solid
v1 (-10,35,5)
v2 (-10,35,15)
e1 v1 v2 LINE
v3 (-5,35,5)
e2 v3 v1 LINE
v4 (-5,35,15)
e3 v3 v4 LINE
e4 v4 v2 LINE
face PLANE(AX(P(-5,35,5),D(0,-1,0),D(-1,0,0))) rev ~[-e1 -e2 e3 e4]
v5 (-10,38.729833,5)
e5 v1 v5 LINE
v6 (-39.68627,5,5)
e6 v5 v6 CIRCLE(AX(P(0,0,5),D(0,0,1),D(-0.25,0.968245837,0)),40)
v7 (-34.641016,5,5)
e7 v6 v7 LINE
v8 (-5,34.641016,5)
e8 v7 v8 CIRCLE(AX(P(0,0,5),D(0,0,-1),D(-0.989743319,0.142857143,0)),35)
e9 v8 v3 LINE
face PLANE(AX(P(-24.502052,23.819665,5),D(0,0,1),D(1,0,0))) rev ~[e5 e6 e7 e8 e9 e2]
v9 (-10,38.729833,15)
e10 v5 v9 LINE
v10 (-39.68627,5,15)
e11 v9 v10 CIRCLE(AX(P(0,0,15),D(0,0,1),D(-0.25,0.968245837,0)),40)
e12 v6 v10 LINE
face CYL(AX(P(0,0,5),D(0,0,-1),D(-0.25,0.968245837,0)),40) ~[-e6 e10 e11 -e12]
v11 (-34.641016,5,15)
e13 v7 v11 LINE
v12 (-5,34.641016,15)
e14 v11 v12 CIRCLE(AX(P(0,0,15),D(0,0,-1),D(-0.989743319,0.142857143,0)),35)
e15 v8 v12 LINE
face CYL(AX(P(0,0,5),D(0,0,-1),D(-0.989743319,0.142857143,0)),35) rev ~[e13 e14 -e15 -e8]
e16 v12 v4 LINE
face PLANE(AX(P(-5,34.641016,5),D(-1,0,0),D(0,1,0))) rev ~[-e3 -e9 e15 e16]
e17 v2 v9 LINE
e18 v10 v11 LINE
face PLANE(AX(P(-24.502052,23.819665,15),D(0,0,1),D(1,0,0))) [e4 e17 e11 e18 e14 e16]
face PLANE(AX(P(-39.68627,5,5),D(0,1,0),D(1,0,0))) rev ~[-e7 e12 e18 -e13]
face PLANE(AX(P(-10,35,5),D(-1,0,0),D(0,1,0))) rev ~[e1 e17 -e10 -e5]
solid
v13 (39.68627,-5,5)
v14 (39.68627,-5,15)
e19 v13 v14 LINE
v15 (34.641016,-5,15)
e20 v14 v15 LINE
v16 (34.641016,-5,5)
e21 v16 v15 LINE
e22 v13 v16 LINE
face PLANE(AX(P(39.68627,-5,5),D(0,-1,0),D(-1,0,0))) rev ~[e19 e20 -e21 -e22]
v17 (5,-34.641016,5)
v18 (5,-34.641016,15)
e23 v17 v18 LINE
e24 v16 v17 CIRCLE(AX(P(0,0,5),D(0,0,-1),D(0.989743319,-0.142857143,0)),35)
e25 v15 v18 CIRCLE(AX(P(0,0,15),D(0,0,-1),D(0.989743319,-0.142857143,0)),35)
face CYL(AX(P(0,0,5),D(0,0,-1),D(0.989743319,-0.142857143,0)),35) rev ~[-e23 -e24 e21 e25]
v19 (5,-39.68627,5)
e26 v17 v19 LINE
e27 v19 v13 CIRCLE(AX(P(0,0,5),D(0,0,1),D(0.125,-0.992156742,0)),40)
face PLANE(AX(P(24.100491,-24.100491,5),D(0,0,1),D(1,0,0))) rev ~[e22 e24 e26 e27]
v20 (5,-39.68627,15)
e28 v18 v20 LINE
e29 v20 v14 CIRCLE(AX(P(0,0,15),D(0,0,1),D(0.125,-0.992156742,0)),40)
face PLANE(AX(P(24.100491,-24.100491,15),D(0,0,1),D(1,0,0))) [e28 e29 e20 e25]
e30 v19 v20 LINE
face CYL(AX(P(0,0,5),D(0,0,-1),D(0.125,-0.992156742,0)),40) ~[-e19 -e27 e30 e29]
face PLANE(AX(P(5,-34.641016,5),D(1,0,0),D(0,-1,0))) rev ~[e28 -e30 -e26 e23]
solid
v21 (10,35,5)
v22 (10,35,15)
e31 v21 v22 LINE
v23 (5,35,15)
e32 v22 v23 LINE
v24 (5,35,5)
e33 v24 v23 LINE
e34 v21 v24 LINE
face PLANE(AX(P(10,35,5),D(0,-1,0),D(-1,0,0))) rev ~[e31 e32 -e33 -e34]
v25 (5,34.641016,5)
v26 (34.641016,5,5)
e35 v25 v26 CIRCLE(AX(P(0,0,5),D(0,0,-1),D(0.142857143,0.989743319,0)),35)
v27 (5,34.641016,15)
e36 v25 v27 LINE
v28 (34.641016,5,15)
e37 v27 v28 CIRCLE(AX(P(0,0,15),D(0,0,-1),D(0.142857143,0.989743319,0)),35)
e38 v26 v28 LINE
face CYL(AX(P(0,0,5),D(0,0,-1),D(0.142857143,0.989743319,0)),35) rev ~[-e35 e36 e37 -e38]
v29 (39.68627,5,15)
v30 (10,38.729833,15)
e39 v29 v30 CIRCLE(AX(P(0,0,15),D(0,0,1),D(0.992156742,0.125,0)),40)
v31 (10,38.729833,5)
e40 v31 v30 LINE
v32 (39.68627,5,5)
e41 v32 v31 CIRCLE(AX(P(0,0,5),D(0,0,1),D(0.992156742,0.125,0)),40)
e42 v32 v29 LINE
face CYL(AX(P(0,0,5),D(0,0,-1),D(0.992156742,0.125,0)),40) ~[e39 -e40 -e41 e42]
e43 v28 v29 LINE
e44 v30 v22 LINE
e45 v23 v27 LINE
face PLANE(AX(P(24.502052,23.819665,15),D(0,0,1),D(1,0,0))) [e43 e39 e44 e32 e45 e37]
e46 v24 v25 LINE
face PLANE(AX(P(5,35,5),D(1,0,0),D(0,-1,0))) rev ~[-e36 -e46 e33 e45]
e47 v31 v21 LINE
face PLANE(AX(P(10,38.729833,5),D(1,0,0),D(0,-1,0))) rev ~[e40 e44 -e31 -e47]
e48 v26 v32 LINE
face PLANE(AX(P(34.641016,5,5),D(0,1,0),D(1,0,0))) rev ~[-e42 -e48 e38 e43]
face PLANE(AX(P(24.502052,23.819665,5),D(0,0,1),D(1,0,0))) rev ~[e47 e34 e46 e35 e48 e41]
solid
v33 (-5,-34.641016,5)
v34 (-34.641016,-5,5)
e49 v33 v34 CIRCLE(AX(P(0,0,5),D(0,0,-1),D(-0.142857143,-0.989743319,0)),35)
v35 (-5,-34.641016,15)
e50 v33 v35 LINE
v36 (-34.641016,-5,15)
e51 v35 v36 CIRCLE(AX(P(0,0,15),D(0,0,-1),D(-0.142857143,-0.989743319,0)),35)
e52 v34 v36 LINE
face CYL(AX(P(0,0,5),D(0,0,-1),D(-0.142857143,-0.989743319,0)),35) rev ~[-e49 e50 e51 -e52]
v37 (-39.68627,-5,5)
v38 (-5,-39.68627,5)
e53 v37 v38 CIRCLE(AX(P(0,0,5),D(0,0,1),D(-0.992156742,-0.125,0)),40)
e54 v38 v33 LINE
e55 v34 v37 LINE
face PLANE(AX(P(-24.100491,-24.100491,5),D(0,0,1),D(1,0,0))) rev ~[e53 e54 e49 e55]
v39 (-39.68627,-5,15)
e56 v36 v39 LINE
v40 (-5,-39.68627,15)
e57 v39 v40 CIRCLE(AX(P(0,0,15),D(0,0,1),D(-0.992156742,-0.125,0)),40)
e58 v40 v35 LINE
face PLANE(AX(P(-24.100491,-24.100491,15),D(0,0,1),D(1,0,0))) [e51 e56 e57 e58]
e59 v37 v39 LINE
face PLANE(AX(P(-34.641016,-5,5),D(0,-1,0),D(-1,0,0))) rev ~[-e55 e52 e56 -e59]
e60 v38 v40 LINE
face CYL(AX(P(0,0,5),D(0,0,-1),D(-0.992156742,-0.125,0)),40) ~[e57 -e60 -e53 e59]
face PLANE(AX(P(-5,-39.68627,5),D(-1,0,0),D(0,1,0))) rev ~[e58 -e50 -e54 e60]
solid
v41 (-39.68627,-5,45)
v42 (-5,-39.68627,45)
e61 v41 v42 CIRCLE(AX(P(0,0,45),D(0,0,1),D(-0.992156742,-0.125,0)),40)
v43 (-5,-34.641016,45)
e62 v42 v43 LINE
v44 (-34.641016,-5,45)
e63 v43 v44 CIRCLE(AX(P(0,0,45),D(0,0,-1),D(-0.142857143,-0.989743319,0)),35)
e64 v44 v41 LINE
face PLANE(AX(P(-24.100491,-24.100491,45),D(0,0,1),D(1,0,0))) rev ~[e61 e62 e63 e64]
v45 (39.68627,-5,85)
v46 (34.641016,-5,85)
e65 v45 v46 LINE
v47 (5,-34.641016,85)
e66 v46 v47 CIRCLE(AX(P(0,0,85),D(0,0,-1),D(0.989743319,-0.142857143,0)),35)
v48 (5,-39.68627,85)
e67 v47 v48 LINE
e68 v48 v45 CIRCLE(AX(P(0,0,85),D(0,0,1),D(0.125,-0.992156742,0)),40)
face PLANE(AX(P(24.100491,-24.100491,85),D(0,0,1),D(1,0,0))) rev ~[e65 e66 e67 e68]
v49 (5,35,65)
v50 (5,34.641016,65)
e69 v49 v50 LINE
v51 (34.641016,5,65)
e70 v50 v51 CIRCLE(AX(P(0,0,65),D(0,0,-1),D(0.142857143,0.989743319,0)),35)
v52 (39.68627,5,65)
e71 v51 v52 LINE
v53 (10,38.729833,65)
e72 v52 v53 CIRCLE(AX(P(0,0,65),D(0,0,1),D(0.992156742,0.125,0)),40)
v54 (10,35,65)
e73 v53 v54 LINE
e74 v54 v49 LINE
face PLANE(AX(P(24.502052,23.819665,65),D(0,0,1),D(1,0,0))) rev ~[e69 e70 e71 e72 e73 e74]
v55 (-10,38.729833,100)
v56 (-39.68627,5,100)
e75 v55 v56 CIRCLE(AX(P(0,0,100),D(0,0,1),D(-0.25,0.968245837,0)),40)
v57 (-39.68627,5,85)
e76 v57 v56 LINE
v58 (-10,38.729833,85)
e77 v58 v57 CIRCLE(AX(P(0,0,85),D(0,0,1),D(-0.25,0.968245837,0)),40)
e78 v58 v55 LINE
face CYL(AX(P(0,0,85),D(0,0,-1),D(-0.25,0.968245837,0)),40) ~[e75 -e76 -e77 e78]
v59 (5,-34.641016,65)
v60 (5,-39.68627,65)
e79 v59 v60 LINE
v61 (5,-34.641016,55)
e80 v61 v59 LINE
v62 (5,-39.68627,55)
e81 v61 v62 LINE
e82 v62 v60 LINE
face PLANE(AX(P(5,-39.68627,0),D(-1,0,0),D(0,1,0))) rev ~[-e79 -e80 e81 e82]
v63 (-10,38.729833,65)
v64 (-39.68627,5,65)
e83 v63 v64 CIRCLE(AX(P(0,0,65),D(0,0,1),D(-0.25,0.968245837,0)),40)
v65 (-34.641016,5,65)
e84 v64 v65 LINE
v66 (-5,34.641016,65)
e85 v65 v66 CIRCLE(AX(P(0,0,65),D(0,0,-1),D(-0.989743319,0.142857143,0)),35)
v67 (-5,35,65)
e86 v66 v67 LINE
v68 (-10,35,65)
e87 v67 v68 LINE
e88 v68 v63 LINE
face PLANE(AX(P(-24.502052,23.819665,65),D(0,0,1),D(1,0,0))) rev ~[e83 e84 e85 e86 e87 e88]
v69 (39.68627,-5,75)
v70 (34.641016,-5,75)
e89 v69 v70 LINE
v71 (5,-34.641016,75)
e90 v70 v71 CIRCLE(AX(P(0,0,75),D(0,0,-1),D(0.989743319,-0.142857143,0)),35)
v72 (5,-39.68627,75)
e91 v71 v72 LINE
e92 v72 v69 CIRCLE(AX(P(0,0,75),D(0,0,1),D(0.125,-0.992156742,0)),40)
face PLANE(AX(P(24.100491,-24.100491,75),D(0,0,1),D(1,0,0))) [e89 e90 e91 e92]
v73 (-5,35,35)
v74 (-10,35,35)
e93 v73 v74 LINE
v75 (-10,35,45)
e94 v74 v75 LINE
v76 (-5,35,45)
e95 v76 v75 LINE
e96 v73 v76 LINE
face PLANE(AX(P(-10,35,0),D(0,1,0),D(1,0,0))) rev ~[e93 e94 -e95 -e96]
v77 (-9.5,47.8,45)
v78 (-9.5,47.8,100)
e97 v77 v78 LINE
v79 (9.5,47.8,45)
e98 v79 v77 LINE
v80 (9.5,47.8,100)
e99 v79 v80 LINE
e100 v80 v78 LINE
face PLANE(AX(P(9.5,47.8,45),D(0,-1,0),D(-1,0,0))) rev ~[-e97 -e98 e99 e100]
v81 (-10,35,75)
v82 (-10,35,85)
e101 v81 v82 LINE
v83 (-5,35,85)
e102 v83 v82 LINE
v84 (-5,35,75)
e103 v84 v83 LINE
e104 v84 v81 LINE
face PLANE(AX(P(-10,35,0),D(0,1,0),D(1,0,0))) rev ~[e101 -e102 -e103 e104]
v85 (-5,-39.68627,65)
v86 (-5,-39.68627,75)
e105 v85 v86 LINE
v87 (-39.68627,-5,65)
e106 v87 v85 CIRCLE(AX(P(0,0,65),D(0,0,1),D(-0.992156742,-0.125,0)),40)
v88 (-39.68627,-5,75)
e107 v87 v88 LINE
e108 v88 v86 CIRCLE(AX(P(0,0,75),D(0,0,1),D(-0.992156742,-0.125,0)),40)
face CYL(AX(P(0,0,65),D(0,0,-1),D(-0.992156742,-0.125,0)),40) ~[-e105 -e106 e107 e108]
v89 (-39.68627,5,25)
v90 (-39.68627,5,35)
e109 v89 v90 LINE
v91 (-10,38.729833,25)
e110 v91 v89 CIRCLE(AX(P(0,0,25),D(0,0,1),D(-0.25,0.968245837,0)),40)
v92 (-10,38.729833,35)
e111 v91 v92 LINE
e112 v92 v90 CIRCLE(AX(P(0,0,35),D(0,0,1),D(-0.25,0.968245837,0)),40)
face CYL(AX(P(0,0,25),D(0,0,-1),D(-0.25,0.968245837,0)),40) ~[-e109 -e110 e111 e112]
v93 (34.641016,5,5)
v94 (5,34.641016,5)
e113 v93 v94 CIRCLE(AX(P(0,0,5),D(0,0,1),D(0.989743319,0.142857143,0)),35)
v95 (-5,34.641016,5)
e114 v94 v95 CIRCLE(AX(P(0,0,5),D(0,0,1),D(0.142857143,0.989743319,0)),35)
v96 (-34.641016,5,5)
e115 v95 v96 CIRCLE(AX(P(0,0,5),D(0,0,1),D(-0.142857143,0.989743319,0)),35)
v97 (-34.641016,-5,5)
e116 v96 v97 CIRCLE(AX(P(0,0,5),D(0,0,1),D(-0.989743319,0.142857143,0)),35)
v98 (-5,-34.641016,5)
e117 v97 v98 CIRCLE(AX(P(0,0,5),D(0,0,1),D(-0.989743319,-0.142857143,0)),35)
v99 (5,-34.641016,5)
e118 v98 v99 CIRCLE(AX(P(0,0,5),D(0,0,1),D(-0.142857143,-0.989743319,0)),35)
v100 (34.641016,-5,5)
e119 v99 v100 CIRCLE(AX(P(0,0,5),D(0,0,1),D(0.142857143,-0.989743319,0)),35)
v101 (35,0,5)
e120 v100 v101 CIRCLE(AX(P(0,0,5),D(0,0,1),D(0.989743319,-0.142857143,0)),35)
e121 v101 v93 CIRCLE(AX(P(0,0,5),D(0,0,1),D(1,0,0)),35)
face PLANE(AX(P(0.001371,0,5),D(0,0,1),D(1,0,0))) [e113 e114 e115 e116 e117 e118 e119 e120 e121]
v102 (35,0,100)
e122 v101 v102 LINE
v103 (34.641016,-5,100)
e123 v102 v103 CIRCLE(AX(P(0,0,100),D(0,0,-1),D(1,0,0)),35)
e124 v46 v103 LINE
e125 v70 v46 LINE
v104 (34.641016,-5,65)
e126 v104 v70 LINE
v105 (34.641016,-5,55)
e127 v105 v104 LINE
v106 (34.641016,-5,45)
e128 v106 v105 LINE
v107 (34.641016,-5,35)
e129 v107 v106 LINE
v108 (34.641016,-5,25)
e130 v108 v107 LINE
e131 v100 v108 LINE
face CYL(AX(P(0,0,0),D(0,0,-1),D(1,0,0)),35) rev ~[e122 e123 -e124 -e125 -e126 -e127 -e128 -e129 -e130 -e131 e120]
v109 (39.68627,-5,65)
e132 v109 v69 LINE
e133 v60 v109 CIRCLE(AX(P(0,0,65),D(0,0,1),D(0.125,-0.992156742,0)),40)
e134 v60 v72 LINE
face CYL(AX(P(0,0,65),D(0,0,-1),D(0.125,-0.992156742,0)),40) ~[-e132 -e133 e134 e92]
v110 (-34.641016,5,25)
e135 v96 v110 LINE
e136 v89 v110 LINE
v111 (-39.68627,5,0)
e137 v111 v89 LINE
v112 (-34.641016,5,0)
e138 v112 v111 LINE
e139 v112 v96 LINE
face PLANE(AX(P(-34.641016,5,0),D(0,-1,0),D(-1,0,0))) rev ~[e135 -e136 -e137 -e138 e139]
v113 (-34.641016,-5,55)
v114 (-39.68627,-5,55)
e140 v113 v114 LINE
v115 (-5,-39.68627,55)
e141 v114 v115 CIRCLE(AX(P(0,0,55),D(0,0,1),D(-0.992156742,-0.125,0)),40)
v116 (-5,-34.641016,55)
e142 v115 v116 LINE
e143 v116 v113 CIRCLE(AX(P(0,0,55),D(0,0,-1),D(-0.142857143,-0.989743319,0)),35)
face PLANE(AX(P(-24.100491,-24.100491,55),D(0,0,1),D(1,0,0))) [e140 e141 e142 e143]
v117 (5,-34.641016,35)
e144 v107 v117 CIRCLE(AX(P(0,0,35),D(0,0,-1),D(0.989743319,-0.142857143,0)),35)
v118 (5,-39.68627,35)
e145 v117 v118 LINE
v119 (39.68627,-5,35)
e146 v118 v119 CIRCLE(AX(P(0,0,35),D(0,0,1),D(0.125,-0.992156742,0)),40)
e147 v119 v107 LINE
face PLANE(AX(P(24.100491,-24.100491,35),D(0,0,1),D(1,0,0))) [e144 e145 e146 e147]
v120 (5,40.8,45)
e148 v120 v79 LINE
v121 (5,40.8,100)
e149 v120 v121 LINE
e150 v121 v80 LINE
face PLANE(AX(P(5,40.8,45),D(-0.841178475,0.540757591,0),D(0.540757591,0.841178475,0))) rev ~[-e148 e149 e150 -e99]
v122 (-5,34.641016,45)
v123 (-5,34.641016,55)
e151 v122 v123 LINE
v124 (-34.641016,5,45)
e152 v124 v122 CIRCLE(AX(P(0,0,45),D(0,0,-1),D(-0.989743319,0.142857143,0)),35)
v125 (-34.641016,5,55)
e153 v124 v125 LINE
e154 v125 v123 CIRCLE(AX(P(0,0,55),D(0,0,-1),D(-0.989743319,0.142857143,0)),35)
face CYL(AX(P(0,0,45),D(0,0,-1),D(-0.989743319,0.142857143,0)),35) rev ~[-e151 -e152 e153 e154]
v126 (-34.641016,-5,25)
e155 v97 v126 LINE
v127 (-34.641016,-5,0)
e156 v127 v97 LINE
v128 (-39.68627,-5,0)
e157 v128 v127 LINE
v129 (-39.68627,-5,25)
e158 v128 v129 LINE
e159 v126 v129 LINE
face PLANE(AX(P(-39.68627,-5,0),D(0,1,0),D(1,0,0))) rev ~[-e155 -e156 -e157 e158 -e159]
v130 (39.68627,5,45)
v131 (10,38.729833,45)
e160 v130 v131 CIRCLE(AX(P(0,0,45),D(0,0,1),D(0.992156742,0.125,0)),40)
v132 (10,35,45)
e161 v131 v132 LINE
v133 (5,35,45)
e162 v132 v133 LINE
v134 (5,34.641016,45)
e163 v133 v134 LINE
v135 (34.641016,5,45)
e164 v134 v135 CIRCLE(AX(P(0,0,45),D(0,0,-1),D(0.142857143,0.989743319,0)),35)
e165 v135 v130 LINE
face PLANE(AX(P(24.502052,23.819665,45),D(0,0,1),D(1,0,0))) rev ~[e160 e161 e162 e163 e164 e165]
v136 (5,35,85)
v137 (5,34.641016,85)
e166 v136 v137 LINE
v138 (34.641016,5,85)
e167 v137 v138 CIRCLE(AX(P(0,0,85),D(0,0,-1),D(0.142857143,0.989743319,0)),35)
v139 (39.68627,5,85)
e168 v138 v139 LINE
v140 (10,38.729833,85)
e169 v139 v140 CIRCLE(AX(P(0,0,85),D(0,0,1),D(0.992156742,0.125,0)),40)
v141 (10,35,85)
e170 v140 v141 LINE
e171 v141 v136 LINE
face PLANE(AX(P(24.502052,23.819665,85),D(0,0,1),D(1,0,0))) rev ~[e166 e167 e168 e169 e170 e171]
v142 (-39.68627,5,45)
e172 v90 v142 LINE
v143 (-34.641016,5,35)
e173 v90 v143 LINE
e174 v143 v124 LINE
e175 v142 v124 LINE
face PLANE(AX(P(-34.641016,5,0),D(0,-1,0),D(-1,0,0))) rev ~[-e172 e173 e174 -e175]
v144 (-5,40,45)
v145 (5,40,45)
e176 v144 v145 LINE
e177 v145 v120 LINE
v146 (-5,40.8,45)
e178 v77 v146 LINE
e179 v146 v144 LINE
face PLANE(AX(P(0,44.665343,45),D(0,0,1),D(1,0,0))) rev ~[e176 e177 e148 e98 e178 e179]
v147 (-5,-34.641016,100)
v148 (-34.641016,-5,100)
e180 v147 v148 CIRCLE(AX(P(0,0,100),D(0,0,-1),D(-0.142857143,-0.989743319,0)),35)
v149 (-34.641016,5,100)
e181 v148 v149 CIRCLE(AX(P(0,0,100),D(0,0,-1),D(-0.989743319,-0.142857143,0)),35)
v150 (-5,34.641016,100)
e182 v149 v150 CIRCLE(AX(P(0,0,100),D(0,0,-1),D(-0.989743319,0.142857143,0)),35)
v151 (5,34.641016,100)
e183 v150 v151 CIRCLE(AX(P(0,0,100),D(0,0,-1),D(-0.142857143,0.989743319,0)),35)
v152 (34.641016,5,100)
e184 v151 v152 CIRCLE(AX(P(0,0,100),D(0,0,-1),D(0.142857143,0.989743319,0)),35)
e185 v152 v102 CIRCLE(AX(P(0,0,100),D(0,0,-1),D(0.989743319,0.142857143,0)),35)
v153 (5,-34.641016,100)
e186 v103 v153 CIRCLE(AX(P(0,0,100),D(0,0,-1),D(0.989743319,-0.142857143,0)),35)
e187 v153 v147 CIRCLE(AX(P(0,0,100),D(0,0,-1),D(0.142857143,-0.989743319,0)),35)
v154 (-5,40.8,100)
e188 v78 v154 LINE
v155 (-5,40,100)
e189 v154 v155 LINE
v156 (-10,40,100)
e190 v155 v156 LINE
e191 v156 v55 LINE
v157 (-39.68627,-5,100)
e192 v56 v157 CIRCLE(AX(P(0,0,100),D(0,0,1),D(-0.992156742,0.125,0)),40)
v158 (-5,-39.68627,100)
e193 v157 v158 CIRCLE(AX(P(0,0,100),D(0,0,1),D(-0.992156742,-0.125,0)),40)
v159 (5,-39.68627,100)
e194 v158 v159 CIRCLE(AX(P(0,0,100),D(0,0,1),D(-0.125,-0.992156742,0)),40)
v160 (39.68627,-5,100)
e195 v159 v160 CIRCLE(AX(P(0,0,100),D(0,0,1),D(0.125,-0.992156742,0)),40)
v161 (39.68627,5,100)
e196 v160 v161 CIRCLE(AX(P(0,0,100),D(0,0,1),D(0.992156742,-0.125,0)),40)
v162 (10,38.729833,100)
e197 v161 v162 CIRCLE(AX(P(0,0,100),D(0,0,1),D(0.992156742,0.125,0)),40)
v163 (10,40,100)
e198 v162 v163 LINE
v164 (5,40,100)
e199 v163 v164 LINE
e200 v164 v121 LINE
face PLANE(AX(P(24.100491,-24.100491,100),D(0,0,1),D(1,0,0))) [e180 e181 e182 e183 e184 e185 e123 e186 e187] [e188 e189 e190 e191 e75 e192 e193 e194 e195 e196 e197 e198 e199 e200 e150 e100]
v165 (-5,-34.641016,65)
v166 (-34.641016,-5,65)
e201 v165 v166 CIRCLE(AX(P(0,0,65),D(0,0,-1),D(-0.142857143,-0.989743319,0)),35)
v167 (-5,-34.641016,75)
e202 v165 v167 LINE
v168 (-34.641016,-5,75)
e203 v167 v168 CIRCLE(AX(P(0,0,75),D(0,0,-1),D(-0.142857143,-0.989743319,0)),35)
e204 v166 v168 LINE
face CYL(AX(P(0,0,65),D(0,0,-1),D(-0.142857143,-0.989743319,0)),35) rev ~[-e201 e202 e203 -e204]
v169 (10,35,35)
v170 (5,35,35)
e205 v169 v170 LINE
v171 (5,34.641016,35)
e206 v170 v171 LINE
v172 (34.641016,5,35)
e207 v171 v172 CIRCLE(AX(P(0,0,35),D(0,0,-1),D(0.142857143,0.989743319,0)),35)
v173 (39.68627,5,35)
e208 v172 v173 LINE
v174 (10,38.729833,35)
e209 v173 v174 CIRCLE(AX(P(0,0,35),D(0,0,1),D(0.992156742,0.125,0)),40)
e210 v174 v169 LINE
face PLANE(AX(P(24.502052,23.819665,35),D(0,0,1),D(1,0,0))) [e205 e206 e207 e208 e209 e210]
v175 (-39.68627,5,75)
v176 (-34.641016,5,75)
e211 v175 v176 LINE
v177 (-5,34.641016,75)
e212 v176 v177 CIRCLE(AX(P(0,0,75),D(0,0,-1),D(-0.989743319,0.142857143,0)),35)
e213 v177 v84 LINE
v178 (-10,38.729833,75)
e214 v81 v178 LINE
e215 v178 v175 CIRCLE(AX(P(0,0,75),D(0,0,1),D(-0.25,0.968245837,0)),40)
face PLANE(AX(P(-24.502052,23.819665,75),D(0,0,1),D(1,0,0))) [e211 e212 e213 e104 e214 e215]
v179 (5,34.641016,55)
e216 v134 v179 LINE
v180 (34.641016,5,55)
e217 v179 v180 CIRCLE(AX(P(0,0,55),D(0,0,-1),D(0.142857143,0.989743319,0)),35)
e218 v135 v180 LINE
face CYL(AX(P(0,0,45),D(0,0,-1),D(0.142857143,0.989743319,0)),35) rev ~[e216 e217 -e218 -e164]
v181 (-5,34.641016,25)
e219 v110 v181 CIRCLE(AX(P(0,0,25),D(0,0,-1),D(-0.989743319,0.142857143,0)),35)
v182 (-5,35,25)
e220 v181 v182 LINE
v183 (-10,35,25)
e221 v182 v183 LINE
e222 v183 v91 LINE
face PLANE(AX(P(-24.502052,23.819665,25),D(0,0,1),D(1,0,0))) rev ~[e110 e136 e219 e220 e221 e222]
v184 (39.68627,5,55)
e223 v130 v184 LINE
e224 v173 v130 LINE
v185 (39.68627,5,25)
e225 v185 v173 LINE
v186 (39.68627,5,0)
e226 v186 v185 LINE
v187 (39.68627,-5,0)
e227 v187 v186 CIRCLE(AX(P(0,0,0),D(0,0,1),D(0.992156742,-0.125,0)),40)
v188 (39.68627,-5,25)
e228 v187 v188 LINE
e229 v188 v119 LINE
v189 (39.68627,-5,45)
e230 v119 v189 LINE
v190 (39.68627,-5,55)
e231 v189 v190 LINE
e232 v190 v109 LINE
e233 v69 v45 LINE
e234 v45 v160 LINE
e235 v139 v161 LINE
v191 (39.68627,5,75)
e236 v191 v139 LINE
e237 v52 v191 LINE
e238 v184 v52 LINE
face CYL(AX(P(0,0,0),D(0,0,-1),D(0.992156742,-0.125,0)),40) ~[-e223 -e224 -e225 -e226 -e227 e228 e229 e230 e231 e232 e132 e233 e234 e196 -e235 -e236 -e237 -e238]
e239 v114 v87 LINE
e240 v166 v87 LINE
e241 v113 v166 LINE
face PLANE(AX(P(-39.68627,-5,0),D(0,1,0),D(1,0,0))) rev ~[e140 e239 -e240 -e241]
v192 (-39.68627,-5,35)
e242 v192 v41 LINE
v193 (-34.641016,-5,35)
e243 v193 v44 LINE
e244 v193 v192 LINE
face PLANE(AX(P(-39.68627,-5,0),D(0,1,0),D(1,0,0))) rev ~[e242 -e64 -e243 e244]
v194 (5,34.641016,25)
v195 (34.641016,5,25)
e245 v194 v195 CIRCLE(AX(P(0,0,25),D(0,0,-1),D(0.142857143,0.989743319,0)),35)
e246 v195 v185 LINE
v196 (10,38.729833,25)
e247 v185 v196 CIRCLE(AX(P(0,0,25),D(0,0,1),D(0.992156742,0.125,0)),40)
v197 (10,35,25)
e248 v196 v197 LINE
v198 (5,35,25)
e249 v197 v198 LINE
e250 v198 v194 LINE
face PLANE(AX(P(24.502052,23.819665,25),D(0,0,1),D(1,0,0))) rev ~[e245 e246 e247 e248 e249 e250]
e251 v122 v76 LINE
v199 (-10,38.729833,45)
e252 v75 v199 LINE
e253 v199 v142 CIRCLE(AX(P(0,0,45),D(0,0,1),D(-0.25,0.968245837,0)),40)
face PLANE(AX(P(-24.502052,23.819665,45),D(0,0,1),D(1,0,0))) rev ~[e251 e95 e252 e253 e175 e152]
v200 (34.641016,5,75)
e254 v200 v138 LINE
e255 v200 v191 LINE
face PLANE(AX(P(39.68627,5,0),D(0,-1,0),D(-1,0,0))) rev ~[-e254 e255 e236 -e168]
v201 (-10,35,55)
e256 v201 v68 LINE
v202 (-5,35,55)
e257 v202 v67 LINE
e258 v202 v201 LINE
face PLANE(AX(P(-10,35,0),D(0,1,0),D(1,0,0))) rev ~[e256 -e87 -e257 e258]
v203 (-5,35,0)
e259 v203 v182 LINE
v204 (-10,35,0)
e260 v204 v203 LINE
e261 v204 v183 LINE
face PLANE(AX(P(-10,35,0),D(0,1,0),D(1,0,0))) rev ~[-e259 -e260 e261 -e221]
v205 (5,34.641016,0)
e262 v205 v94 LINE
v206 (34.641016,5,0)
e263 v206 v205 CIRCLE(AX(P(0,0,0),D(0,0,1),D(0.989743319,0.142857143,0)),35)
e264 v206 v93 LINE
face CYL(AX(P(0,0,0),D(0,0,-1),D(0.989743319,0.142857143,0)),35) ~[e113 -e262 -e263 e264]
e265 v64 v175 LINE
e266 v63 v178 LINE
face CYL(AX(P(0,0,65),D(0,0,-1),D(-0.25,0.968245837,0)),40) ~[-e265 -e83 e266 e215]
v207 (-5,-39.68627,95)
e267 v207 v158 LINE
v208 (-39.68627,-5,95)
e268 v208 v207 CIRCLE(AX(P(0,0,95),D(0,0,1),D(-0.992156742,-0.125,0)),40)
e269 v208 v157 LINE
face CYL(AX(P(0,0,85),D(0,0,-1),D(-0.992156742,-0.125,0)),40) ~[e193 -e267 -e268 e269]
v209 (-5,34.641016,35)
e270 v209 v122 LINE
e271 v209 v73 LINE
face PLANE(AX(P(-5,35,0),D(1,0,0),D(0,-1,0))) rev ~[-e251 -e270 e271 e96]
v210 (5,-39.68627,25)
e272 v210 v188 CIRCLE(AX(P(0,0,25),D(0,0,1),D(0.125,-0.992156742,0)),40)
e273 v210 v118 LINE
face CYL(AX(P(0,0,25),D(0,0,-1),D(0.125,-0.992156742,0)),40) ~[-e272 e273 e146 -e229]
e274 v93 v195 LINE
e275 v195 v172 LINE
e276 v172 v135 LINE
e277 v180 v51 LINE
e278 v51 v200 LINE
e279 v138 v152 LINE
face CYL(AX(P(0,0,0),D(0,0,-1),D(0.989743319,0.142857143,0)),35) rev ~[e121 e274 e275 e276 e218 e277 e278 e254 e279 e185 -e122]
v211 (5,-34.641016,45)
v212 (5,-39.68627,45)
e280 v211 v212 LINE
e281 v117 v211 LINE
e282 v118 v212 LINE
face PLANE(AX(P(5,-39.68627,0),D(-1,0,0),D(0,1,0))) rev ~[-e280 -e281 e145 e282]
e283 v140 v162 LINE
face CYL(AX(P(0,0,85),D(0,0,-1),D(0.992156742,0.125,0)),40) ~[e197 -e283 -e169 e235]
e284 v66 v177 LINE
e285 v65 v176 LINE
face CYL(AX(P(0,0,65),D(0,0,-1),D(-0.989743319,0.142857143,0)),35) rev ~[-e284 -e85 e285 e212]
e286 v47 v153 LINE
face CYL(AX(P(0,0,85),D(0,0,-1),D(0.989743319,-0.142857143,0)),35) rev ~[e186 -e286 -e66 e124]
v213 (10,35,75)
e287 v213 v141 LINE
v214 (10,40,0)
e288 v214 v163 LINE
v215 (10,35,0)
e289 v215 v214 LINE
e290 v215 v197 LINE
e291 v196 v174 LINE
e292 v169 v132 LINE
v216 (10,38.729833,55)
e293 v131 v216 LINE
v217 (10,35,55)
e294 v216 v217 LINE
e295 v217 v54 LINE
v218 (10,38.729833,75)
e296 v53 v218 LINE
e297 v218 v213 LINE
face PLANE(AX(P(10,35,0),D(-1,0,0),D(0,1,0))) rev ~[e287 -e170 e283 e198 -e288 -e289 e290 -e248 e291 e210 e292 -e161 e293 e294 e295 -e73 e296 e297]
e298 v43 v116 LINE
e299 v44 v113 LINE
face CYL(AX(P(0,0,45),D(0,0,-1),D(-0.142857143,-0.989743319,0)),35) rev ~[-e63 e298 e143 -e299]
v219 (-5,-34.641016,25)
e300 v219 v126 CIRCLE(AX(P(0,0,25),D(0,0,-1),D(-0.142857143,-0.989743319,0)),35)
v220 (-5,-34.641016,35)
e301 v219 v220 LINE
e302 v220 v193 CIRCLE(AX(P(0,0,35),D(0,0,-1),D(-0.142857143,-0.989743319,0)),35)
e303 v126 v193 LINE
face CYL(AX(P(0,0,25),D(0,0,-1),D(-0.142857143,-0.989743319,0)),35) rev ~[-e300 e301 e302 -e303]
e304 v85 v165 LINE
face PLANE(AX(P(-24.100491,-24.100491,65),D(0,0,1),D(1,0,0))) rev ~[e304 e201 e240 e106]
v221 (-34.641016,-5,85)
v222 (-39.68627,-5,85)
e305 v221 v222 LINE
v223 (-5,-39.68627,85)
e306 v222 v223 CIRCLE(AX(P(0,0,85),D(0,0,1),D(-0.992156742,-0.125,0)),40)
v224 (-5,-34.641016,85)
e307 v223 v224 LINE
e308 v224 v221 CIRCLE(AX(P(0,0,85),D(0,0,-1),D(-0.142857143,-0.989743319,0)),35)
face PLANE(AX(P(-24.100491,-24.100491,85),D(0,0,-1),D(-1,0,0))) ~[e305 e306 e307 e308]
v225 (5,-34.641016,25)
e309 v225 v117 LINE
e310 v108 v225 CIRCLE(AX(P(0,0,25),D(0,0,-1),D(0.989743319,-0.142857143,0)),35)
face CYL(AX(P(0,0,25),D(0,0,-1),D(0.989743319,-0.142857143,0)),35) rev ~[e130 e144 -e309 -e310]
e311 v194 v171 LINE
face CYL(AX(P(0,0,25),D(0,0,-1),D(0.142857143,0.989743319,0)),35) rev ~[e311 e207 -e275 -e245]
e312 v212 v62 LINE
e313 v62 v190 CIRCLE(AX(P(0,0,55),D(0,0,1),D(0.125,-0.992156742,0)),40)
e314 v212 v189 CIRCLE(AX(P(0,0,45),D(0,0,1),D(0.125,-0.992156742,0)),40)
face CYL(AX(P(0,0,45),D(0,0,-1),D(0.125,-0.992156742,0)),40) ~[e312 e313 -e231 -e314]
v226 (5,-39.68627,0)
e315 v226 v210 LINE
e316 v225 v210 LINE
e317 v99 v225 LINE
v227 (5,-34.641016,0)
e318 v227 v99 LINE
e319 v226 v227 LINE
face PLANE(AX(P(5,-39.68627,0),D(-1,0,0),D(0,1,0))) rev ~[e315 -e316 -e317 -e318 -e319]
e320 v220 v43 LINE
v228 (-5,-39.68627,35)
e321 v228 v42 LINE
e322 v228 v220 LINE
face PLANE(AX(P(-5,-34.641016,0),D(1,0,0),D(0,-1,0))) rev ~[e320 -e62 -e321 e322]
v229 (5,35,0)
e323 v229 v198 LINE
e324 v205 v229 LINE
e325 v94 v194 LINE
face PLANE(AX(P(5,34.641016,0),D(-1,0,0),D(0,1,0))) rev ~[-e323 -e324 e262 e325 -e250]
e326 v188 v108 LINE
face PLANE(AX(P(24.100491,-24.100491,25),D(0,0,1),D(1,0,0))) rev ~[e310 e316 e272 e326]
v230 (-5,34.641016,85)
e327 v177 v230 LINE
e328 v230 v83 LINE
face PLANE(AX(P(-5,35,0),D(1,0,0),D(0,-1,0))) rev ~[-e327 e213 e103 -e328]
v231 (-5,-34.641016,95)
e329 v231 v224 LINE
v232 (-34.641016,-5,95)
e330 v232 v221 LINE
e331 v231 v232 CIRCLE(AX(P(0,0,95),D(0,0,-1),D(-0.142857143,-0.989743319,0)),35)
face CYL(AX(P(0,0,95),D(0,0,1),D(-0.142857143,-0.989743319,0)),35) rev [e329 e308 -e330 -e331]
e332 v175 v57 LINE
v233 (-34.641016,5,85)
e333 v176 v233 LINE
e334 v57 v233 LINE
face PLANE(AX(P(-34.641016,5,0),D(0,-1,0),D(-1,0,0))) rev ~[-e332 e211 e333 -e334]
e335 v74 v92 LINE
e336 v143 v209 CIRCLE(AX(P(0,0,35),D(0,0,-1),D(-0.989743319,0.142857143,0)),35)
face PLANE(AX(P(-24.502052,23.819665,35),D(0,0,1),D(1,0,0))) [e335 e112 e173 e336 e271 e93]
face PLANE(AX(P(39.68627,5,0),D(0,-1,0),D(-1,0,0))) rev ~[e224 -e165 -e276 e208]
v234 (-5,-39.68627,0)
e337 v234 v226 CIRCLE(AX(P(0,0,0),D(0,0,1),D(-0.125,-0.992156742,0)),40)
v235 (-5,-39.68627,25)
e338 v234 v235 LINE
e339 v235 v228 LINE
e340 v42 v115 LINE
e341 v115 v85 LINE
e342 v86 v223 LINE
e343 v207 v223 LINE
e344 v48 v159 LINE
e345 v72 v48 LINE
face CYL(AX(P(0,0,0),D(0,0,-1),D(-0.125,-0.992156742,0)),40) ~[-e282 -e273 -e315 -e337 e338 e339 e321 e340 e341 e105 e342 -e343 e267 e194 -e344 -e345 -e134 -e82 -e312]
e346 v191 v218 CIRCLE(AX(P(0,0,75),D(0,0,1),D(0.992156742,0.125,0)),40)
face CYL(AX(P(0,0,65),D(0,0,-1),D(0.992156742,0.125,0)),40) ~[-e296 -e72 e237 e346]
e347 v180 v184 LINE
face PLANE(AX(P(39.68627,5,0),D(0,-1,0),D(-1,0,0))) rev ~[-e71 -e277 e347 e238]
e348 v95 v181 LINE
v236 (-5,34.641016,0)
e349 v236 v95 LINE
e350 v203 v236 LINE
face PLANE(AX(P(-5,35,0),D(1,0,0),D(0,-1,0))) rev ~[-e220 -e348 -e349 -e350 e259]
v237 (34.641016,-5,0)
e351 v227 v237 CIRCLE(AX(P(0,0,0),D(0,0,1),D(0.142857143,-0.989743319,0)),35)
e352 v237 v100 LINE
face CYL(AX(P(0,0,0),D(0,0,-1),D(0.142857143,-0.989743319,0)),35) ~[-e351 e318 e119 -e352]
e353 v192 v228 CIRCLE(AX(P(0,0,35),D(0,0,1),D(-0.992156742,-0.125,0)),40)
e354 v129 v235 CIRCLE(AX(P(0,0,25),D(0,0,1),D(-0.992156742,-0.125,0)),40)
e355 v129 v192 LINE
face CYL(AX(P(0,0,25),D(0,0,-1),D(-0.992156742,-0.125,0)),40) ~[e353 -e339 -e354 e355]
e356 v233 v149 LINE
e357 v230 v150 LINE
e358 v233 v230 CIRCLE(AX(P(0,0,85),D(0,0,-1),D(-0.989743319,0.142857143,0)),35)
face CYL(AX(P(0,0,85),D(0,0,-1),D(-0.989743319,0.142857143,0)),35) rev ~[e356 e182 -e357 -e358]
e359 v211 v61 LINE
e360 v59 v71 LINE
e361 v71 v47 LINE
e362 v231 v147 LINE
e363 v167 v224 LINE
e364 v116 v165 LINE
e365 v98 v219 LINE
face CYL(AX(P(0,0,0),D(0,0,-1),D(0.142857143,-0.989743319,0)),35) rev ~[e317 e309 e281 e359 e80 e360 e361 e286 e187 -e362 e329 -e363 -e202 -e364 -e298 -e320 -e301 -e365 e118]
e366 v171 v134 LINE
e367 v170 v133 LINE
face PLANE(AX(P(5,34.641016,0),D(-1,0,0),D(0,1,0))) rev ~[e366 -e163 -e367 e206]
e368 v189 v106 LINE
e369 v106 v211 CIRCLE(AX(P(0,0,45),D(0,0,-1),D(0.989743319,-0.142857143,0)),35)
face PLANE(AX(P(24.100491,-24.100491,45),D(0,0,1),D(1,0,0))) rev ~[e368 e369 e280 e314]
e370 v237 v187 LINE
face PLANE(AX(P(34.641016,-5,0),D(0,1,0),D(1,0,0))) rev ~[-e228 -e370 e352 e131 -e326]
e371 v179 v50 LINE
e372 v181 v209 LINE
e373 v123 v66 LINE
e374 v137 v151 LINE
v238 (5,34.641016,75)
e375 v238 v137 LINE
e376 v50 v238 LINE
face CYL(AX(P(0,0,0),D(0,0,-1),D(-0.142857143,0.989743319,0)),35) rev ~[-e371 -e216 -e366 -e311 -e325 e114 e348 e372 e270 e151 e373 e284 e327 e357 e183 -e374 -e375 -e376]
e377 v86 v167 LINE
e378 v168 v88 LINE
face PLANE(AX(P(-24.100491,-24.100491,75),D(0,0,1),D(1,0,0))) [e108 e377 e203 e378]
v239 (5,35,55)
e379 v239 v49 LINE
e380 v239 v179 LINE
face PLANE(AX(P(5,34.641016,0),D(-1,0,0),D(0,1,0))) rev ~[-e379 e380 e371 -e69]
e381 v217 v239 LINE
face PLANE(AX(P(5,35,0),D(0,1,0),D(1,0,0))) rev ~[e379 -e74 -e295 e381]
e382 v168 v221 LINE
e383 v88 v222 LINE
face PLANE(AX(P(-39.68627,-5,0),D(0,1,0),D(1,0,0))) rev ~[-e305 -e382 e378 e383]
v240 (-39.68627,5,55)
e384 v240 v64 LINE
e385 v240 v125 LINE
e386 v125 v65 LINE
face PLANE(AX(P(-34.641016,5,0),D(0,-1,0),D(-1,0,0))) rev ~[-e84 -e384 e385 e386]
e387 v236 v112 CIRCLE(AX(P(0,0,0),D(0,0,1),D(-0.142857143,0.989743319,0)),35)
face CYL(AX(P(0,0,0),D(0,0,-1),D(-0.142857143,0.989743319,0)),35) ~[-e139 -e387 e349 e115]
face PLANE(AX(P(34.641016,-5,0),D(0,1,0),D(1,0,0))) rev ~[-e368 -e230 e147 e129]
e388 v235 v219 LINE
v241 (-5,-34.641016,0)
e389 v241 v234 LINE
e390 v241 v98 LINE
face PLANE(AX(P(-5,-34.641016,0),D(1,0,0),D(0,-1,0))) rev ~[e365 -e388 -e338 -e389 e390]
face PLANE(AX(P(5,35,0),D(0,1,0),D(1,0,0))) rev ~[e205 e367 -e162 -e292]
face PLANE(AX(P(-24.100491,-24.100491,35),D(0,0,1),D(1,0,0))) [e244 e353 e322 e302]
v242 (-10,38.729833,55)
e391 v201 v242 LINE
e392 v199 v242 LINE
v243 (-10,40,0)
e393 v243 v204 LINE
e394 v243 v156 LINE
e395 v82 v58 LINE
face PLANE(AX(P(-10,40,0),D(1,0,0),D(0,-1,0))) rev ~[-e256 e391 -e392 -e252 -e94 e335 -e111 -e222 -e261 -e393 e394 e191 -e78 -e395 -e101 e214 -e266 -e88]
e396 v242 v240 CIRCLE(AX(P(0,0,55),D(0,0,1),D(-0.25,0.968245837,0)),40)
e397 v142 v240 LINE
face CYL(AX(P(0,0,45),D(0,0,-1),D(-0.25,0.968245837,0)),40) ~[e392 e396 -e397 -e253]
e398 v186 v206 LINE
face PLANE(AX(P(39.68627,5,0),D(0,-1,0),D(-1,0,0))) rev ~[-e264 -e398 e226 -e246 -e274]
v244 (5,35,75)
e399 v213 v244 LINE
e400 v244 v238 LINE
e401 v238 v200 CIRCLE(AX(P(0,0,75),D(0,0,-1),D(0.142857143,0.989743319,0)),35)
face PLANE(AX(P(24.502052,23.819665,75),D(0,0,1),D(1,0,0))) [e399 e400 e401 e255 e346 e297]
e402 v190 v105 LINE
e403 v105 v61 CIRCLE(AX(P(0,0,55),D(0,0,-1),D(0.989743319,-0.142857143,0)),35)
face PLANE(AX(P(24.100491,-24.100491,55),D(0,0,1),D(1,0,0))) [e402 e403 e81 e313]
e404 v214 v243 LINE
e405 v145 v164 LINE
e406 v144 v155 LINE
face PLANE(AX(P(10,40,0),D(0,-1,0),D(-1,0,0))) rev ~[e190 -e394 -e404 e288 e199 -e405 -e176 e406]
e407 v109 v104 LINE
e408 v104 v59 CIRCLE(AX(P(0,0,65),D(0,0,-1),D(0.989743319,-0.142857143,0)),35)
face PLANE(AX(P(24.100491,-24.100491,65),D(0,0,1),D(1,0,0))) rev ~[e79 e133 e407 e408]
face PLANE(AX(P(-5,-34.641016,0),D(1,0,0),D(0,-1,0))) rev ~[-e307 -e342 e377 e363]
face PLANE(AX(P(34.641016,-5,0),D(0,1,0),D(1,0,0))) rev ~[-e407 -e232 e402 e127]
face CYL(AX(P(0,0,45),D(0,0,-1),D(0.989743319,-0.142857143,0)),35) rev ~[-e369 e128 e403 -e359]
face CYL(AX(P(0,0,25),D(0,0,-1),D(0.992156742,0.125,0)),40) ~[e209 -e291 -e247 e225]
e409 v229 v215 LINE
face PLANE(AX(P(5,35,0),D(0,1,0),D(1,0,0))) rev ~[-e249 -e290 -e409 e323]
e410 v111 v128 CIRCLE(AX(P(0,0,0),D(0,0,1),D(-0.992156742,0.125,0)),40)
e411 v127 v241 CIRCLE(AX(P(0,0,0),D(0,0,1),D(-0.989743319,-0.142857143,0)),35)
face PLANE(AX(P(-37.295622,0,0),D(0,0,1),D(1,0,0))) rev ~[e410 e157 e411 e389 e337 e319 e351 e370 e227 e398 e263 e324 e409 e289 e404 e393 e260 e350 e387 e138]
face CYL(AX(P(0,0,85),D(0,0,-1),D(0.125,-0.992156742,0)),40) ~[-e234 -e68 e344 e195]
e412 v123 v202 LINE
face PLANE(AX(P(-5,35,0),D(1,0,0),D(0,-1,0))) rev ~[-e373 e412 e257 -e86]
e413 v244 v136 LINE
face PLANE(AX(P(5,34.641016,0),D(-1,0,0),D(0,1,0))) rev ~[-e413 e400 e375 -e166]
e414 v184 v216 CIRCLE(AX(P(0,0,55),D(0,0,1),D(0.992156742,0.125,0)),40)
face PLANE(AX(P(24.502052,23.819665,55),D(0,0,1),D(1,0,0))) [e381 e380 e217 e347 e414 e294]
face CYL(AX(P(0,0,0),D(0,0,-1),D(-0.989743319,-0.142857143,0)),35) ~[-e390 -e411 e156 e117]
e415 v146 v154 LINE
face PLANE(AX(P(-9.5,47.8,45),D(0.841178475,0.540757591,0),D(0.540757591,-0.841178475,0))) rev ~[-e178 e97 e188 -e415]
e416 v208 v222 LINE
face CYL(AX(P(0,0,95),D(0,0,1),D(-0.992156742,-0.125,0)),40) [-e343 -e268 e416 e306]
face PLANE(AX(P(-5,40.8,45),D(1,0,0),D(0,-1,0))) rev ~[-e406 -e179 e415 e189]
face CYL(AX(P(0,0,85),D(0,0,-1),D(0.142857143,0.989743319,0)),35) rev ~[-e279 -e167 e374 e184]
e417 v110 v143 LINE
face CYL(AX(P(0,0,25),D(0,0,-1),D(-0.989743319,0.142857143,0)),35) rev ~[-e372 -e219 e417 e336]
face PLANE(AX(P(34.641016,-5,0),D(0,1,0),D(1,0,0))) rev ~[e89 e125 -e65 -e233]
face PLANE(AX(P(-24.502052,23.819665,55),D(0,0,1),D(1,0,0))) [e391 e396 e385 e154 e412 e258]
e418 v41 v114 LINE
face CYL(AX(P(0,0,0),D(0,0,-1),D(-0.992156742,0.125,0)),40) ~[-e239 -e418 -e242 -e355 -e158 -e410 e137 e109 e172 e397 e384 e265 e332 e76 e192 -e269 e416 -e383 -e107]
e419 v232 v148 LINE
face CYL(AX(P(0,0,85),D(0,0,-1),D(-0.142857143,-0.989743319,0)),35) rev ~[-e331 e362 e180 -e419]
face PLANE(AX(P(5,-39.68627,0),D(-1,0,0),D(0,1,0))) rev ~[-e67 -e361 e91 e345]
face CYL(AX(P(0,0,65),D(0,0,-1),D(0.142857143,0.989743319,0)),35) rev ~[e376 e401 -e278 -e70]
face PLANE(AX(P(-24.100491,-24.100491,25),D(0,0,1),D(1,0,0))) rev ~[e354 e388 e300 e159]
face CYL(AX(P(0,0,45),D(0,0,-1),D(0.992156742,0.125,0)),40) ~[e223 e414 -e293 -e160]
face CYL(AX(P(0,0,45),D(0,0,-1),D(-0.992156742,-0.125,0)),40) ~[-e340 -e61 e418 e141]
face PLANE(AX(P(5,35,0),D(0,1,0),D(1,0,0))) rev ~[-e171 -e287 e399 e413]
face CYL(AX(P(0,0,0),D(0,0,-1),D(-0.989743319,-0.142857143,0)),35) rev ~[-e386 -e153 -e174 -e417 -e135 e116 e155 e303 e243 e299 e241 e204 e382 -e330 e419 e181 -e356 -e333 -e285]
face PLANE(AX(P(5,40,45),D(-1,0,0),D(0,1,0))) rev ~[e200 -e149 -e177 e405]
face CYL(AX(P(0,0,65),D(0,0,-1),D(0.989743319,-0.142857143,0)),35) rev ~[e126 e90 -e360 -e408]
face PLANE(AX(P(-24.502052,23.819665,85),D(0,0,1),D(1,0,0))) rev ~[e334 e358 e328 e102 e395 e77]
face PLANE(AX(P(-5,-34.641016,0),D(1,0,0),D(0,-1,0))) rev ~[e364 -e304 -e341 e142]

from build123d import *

# Parameters (mm, degrees)
F1_DEPTH = 5
F2_DEPTH = 100
F3_START = 5
F3_DEPTH = 10
F4_START = 25
F4_DEPTH = 10
F5_START = 45
F5_DEPTH = 55
F6_START = 45
F6_DEPTH = 10
F7_START = 65
F7_DEPTH = 10
F8_START = 85
F8_DEPTH = 15


# Not quite as in the source:
# - a pattern or mirror of a feature is missing from the dataset's text; its kind, count and spacing are read off the source's solid


with BuildPart() as f1:
    # F0 (on Top) → F1 (new body)
    with BuildSketch(Plane.XY):
        with BuildLine():
            ThreePointArc((34.6410161514, -5), (34.9101386799, -2.5064351879), (35, 0))
            ThreePointArc((35, 0), (34.9101386799, 2.5064351879), (34.6410161514, 5))
            ThreePointArc((34.6410161514, 5), (24.7487373415, 24.7487373415), (5, 34.6410161514))
            ThreePointArc((5, 34.6410161514), (0, 35), (-5, 34.6410161514))
            ThreePointArc((-5, 34.6410161514), (-24.7487373415, 24.7487373415), (-34.6410161514, 5))
            ThreePointArc((-34.6410161514, 5), (-35, 0), (-34.6410161514, -5))
            ThreePointArc((-34.6410161514, -5), (-24.7487373415, -24.7487373415), (-5, -34.6410161514))
            ThreePointArc((-5, -34.6410161514), (0, -35), (5, -34.6410161514))
            ThreePointArc((5, -34.6410161514), (24.7487373415, -24.7487373415), (34.6410161514, -5))
        make_face()
    extrude(amount=F1_DEPTH)

    # F0 (on Top) → F2 (join)
    with BuildSketch(Plane.XY):
        with BuildLine():
            ThreePointArc((-34.6410161514, -5), (-35, 0), (-34.6410161514, 5))
            Line((-34.6410161514, 5), (-39.686269666, 5))
            ThreePointArc((-39.686269666, 5), (-40, 0), (-39.686269666, -5))
            Line((-39.686269666, -5), (-34.6410161514, -5))
        make_face()
        with BuildLine():
            Line((5, -39.686269666), (5, -34.6410161514))
            ThreePointArc((5, -34.6410161514), (0, -35), (-5, -34.6410161514))
            Line((-5, -34.6410161514), (-5, -39.686269666))
            ThreePointArc((-5, -39.686269666), (0, -40), (5, -39.686269666))
        make_face()
        with BuildLine():
            ThreePointArc((34.6410161514, 5), (34.9101386799, 2.5064351879), (35, 0))
            ThreePointArc((35, 0), (34.9101386799, -2.5064351879), (34.6410161514, -5))
            Line((34.6410161514, -5), (39.686269666, -5))
            ThreePointArc((39.686269666, -5), (40, 0), (39.686269666, 5))
            Line((39.686269666, 5), (34.6410161514, 5))
        make_face()
        with BuildLine():
            ThreePointArc((-5, 34.6410161514), (0, 35), (5, 34.6410161514))
            Line((5, 34.6410161514), (5, 35))
            Line((5, 35), (10, 35))
            Line((10, 35), (10, 38.7298334621))
            Line((10, 38.7298334621), (10, 40))
            Line((10, 40), (5, 40))
            Line((5, 40), (-5, 40))
            Line((-5, 40), (-10, 40))
            Line((-10, 40), (-10, 38.7298334621))
            Line((-10, 38.7298334621), (-10, 35))
            Line((-10, 35), (-5, 35))
            Line((-5, 35), (-5, 34.6410161514))
        make_face()
    extrude(amount=F2_DEPTH)

    # F3_copies: F3 across plane


with BuildPart() as f3:
    # F0 (on Top) → F3 (new body)
    with BuildSketch(Plane.XY.offset(F3_START)):
        with BuildLine():
            Line((-5, -39.686269666), (-5, -34.6410161514))
            ThreePointArc((-5, -34.6410161514), (-24.7487373415, -24.7487373415), (-34.6410161514, -5))
            Line((-34.6410161514, -5), (-39.686269666, -5))
            ThreePointArc((-39.686269666, -5), (-28.2842712475, -28.2842712475), (-5, -39.686269666))
        make_face()
    extrude(amount=F3_DEPTH)


with BuildPart() as f3b:
    # F0 (on Top) → F3, piece 2 (new body)
    with BuildSketch(Plane.XY.offset(F3_START)):
        with BuildLine():
            Line((39.686269666, -5), (34.6410161514, -5))
            ThreePointArc((34.6410161514, -5), (24.7487373415, -24.7487373415), (5, -34.6410161514))
            Line((5, -34.6410161514), (5, -39.686269666))
            ThreePointArc((5, -39.686269666), (28.2842712475, -28.2842712475), (39.686269666, -5))
        make_face()
    extrude(amount=F3_DEPTH)


with BuildPart() as f3c:
    # F0 (on Top) → F3, piece 3 (new body)
    with BuildSketch(Plane.XY.offset(F3_START)):
        with BuildLine():
            ThreePointArc((5, 34.6410161514), (24.7487373415, 24.7487373415), (34.6410161514, 5))
            Line((34.6410161514, 5), (39.686269666, 5))
            ThreePointArc((39.686269666, 5), (30.0267674696, 26.4271306677), (10, 38.7298334621))
            Line((10, 38.7298334621), (10, 35))
            Line((10, 35), (5, 35))
            Line((5, 35), (5, 34.6410161514))
        make_face()
    extrude(amount=F3_DEPTH)


with BuildPart() as f3d:
    # F0 (on Top) → F3, piece 4 (new body)
    with BuildSketch(Plane.XY.offset(F3_START)):
        with BuildLine():
            ThreePointArc((-34.6410161514, 5), (-24.7487373415, 24.7487373415), (-5, 34.6410161514))
            Line((-5, 34.6410161514), (-5, 35))
            Line((-5, 35), (-10, 35))
            Line((-10, 35), (-10, 38.7298334621))
            ThreePointArc((-10, 38.7298334621), (-30.0267674696, 26.4271306677), (-39.686269666, 5))
            Line((-39.686269666, 5), (-34.6410161514, 5))
        make_face()
    extrude(amount=F3_DEPTH)


with BuildPart() as f1_1:
    add(f1.part)
    add(f3.part.mirror(Plane.XY.offset(50)))

    # F0 (on Top) → F4 (join)
    with BuildSketch(Plane.XY.offset(F4_START)):
        with BuildLine():
            Line((-5, -39.686269666), (-5, -34.6410161514))
            ThreePointArc((-5, -34.6410161514), (-24.7487373415, -24.7487373415), (-34.6410161514, -5))
            Line((-34.6410161514, -5), (-39.686269666, -5))
            ThreePointArc((-39.686269666, -5), (-28.2842712475, -28.2842712475), (-5, -39.686269666))
        make_face()
        with BuildLine():
            ThreePointArc((-34.6410161514, 5), (-24.7487373415, 24.7487373415), (-5, 34.6410161514))
            Line((-5, 34.6410161514), (-5, 35))
            Line((-5, 35), (-10, 35))
            Line((-10, 35), (-10, 38.7298334621))
            ThreePointArc((-10, 38.7298334621), (-30.0267674696, 26.4271306677), (-39.686269666, 5))
            Line((-39.686269666, 5), (-34.6410161514, 5))
        make_face()
        with BuildLine():
            ThreePointArc((5, 34.6410161514), (24.7487373415, 24.7487373415), (34.6410161514, 5))
            Line((34.6410161514, 5), (39.686269666, 5))
            ThreePointArc((39.686269666, 5), (30.0267674696, 26.4271306677), (10, 38.7298334621))
            Line((10, 38.7298334621), (10, 35))
            Line((10, 35), (5, 35))
            Line((5, 35), (5, 34.6410161514))
        make_face()
        with BuildLine():
            Line((39.686269666, -5), (34.6410161514, -5))
            ThreePointArc((34.6410161514, -5), (24.7487373415, -24.7487373415), (5, -34.6410161514))
            Line((5, -34.6410161514), (5, -39.686269666))
            ThreePointArc((5, -39.686269666), (28.2842712475, -28.2842712475), (39.686269666, -5))
        make_face()
    extrude(amount=F4_DEPTH)

    # F0 (on Top) → F5 (join)
    with BuildSketch(Plane.XY.offset(F5_START)):
        Polygon((-5, 40), (5, 40), (5, 40.8), (9.5, 47.8), (-9.5, 47.8), (-5, 40.8), align=None)
    extrude(amount=F5_DEPTH)

    # F0 (on Top) → F6 (join)
    with BuildSketch(Plane.XY.offset(F6_START)):
        with BuildLine():
            ThreePointArc((-34.6410161514, 5), (-24.7487373415, 24.7487373415), (-5, 34.6410161514))
            Line((-5, 34.6410161514), (-5, 35))
            Line((-5, 35), (-10, 35))
            Line((-10, 35), (-10, 38.7298334621))
            ThreePointArc((-10, 38.7298334621), (-30.0267674696, 26.4271306677), (-39.686269666, 5))
            Line((-39.686269666, 5), (-34.6410161514, 5))
        make_face()
        with BuildLine():
            Line((-5, -39.686269666), (-5, -34.6410161514))
            ThreePointArc((-5, -34.6410161514), (-24.7487373415, -24.7487373415), (-34.6410161514, -5))
            Line((-34.6410161514, -5), (-39.686269666, -5))
            ThreePointArc((-39.686269666, -5), (-28.2842712475, -28.2842712475), (-5, -39.686269666))
        make_face()
        with BuildLine():
            Line((39.686269666, -5), (34.6410161514, -5))
            ThreePointArc((34.6410161514, -5), (24.7487373415, -24.7487373415), (5, -34.6410161514))
            Line((5, -34.6410161514), (5, -39.686269666))
            ThreePointArc((5, -39.686269666), (28.2842712475, -28.2842712475), (39.686269666, -5))
        make_face()
        with BuildLine():
            ThreePointArc((5, 34.6410161514), (24.7487373415, 24.7487373415), (34.6410161514, 5))
            Line((34.6410161514, 5), (39.686269666, 5))
            ThreePointArc((39.686269666, 5), (30.0267674696, 26.4271306677), (10, 38.7298334621))
            Line((10, 38.7298334621), (10, 35))
            Line((10, 35), (5, 35))
            Line((5, 35), (5, 34.6410161514))
        make_face()
    extrude(amount=F6_DEPTH)

    # F0 (on Top) → F7 (join)
    with BuildSketch(Plane.XY.offset(F7_START)):
        with BuildLine():
            Line((39.686269666, -5), (34.6410161514, -5))
            ThreePointArc((34.6410161514, -5), (24.7487373415, -24.7487373415), (5, -34.6410161514))
            Line((5, -34.6410161514), (5, -39.686269666))
            ThreePointArc((5, -39.686269666), (28.2842712475, -28.2842712475), (39.686269666, -5))
        make_face()
        with BuildLine():
            Line((-5, -39.686269666), (-5, -34.6410161514))
            ThreePointArc((-5, -34.6410161514), (-24.7487373415, -24.7487373415), (-34.6410161514, -5))
            Line((-34.6410161514, -5), (-39.686269666, -5))
            ThreePointArc((-39.686269666, -5), (-28.2842712475, -28.2842712475), (-5, -39.686269666))
        make_face()
        with BuildLine():
            ThreePointArc((-34.6410161514, 5), (-24.7487373415, 24.7487373415), (-5, 34.6410161514))
            Line((-5, 34.6410161514), (-5, 35))
            Line((-5, 35), (-10, 35))
            Line((-10, 35), (-10, 38.7298334621))
            ThreePointArc((-10, 38.7298334621), (-30.0267674696, 26.4271306677), (-39.686269666, 5))
            Line((-39.686269666, 5), (-34.6410161514, 5))
        make_face()
        with BuildLine():
            ThreePointArc((5, 34.6410161514), (24.7487373415, 24.7487373415), (34.6410161514, 5))
            Line((34.6410161514, 5), (39.686269666, 5))
            ThreePointArc((39.686269666, 5), (30.0267674696, 26.4271306677), (10, 38.7298334621))
            Line((10, 38.7298334621), (10, 35))
            Line((10, 35), (5, 35))
            Line((5, 35), (5, 34.6410161514))
        make_face()
    extrude(amount=F7_DEPTH)

    # F0 (on Top) → F8 (join)
    with BuildSketch(Plane.XY.offset(F8_START)):
        with BuildLine():
            Line((39.686269666, -5), (34.6410161514, -5))
            ThreePointArc((34.6410161514, -5), (24.7487373415, -24.7487373415), (5, -34.6410161514))
            Line((5, -34.6410161514), (5, -39.686269666))
            ThreePointArc((5, -39.686269666), (28.2842712475, -28.2842712475), (39.686269666, -5))
        make_face()
        with BuildLine():
            Line((-5, -39.686269666), (-5, -34.6410161514))
            ThreePointArc((-5, -34.6410161514), (-24.7487373415, -24.7487373415), (-34.6410161514, -5))
            Line((-34.6410161514, -5), (-39.686269666, -5))
            ThreePointArc((-39.686269666, -5), (-28.2842712475, -28.2842712475), (-5, -39.686269666))
        make_face()
        with BuildLine():
            ThreePointArc((-34.6410161514, 5), (-24.7487373415, 24.7487373415), (-5, 34.6410161514))
            Line((-5, 34.6410161514), (-5, 35))
            Line((-5, 35), (-10, 35))
            Line((-10, 35), (-10, 38.7298334621))
            ThreePointArc((-10, 38.7298334621), (-30.0267674696, 26.4271306677), (-39.686269666, 5))
            Line((-39.686269666, 5), (-34.6410161514, 5))
        make_face()
        with BuildLine():
            ThreePointArc((5, 34.6410161514), (24.7487373415, 24.7487373415), (34.6410161514, 5))
            Line((34.6410161514, 5), (39.686269666, 5))
            ThreePointArc((39.686269666, 5), (30.0267674696, 26.4271306677), (10, 38.7298334621))
            Line((10, 38.7298334621), (10, 35))
            Line((10, 35), (5, 35))
            Line((5, 35), (5, 34.6410161514))
        make_face()
    extrude(amount=F8_DEPTH)


solid = Compound([f3.part, f3b.part, f3c.part, f3d.part, f1_1.part])
